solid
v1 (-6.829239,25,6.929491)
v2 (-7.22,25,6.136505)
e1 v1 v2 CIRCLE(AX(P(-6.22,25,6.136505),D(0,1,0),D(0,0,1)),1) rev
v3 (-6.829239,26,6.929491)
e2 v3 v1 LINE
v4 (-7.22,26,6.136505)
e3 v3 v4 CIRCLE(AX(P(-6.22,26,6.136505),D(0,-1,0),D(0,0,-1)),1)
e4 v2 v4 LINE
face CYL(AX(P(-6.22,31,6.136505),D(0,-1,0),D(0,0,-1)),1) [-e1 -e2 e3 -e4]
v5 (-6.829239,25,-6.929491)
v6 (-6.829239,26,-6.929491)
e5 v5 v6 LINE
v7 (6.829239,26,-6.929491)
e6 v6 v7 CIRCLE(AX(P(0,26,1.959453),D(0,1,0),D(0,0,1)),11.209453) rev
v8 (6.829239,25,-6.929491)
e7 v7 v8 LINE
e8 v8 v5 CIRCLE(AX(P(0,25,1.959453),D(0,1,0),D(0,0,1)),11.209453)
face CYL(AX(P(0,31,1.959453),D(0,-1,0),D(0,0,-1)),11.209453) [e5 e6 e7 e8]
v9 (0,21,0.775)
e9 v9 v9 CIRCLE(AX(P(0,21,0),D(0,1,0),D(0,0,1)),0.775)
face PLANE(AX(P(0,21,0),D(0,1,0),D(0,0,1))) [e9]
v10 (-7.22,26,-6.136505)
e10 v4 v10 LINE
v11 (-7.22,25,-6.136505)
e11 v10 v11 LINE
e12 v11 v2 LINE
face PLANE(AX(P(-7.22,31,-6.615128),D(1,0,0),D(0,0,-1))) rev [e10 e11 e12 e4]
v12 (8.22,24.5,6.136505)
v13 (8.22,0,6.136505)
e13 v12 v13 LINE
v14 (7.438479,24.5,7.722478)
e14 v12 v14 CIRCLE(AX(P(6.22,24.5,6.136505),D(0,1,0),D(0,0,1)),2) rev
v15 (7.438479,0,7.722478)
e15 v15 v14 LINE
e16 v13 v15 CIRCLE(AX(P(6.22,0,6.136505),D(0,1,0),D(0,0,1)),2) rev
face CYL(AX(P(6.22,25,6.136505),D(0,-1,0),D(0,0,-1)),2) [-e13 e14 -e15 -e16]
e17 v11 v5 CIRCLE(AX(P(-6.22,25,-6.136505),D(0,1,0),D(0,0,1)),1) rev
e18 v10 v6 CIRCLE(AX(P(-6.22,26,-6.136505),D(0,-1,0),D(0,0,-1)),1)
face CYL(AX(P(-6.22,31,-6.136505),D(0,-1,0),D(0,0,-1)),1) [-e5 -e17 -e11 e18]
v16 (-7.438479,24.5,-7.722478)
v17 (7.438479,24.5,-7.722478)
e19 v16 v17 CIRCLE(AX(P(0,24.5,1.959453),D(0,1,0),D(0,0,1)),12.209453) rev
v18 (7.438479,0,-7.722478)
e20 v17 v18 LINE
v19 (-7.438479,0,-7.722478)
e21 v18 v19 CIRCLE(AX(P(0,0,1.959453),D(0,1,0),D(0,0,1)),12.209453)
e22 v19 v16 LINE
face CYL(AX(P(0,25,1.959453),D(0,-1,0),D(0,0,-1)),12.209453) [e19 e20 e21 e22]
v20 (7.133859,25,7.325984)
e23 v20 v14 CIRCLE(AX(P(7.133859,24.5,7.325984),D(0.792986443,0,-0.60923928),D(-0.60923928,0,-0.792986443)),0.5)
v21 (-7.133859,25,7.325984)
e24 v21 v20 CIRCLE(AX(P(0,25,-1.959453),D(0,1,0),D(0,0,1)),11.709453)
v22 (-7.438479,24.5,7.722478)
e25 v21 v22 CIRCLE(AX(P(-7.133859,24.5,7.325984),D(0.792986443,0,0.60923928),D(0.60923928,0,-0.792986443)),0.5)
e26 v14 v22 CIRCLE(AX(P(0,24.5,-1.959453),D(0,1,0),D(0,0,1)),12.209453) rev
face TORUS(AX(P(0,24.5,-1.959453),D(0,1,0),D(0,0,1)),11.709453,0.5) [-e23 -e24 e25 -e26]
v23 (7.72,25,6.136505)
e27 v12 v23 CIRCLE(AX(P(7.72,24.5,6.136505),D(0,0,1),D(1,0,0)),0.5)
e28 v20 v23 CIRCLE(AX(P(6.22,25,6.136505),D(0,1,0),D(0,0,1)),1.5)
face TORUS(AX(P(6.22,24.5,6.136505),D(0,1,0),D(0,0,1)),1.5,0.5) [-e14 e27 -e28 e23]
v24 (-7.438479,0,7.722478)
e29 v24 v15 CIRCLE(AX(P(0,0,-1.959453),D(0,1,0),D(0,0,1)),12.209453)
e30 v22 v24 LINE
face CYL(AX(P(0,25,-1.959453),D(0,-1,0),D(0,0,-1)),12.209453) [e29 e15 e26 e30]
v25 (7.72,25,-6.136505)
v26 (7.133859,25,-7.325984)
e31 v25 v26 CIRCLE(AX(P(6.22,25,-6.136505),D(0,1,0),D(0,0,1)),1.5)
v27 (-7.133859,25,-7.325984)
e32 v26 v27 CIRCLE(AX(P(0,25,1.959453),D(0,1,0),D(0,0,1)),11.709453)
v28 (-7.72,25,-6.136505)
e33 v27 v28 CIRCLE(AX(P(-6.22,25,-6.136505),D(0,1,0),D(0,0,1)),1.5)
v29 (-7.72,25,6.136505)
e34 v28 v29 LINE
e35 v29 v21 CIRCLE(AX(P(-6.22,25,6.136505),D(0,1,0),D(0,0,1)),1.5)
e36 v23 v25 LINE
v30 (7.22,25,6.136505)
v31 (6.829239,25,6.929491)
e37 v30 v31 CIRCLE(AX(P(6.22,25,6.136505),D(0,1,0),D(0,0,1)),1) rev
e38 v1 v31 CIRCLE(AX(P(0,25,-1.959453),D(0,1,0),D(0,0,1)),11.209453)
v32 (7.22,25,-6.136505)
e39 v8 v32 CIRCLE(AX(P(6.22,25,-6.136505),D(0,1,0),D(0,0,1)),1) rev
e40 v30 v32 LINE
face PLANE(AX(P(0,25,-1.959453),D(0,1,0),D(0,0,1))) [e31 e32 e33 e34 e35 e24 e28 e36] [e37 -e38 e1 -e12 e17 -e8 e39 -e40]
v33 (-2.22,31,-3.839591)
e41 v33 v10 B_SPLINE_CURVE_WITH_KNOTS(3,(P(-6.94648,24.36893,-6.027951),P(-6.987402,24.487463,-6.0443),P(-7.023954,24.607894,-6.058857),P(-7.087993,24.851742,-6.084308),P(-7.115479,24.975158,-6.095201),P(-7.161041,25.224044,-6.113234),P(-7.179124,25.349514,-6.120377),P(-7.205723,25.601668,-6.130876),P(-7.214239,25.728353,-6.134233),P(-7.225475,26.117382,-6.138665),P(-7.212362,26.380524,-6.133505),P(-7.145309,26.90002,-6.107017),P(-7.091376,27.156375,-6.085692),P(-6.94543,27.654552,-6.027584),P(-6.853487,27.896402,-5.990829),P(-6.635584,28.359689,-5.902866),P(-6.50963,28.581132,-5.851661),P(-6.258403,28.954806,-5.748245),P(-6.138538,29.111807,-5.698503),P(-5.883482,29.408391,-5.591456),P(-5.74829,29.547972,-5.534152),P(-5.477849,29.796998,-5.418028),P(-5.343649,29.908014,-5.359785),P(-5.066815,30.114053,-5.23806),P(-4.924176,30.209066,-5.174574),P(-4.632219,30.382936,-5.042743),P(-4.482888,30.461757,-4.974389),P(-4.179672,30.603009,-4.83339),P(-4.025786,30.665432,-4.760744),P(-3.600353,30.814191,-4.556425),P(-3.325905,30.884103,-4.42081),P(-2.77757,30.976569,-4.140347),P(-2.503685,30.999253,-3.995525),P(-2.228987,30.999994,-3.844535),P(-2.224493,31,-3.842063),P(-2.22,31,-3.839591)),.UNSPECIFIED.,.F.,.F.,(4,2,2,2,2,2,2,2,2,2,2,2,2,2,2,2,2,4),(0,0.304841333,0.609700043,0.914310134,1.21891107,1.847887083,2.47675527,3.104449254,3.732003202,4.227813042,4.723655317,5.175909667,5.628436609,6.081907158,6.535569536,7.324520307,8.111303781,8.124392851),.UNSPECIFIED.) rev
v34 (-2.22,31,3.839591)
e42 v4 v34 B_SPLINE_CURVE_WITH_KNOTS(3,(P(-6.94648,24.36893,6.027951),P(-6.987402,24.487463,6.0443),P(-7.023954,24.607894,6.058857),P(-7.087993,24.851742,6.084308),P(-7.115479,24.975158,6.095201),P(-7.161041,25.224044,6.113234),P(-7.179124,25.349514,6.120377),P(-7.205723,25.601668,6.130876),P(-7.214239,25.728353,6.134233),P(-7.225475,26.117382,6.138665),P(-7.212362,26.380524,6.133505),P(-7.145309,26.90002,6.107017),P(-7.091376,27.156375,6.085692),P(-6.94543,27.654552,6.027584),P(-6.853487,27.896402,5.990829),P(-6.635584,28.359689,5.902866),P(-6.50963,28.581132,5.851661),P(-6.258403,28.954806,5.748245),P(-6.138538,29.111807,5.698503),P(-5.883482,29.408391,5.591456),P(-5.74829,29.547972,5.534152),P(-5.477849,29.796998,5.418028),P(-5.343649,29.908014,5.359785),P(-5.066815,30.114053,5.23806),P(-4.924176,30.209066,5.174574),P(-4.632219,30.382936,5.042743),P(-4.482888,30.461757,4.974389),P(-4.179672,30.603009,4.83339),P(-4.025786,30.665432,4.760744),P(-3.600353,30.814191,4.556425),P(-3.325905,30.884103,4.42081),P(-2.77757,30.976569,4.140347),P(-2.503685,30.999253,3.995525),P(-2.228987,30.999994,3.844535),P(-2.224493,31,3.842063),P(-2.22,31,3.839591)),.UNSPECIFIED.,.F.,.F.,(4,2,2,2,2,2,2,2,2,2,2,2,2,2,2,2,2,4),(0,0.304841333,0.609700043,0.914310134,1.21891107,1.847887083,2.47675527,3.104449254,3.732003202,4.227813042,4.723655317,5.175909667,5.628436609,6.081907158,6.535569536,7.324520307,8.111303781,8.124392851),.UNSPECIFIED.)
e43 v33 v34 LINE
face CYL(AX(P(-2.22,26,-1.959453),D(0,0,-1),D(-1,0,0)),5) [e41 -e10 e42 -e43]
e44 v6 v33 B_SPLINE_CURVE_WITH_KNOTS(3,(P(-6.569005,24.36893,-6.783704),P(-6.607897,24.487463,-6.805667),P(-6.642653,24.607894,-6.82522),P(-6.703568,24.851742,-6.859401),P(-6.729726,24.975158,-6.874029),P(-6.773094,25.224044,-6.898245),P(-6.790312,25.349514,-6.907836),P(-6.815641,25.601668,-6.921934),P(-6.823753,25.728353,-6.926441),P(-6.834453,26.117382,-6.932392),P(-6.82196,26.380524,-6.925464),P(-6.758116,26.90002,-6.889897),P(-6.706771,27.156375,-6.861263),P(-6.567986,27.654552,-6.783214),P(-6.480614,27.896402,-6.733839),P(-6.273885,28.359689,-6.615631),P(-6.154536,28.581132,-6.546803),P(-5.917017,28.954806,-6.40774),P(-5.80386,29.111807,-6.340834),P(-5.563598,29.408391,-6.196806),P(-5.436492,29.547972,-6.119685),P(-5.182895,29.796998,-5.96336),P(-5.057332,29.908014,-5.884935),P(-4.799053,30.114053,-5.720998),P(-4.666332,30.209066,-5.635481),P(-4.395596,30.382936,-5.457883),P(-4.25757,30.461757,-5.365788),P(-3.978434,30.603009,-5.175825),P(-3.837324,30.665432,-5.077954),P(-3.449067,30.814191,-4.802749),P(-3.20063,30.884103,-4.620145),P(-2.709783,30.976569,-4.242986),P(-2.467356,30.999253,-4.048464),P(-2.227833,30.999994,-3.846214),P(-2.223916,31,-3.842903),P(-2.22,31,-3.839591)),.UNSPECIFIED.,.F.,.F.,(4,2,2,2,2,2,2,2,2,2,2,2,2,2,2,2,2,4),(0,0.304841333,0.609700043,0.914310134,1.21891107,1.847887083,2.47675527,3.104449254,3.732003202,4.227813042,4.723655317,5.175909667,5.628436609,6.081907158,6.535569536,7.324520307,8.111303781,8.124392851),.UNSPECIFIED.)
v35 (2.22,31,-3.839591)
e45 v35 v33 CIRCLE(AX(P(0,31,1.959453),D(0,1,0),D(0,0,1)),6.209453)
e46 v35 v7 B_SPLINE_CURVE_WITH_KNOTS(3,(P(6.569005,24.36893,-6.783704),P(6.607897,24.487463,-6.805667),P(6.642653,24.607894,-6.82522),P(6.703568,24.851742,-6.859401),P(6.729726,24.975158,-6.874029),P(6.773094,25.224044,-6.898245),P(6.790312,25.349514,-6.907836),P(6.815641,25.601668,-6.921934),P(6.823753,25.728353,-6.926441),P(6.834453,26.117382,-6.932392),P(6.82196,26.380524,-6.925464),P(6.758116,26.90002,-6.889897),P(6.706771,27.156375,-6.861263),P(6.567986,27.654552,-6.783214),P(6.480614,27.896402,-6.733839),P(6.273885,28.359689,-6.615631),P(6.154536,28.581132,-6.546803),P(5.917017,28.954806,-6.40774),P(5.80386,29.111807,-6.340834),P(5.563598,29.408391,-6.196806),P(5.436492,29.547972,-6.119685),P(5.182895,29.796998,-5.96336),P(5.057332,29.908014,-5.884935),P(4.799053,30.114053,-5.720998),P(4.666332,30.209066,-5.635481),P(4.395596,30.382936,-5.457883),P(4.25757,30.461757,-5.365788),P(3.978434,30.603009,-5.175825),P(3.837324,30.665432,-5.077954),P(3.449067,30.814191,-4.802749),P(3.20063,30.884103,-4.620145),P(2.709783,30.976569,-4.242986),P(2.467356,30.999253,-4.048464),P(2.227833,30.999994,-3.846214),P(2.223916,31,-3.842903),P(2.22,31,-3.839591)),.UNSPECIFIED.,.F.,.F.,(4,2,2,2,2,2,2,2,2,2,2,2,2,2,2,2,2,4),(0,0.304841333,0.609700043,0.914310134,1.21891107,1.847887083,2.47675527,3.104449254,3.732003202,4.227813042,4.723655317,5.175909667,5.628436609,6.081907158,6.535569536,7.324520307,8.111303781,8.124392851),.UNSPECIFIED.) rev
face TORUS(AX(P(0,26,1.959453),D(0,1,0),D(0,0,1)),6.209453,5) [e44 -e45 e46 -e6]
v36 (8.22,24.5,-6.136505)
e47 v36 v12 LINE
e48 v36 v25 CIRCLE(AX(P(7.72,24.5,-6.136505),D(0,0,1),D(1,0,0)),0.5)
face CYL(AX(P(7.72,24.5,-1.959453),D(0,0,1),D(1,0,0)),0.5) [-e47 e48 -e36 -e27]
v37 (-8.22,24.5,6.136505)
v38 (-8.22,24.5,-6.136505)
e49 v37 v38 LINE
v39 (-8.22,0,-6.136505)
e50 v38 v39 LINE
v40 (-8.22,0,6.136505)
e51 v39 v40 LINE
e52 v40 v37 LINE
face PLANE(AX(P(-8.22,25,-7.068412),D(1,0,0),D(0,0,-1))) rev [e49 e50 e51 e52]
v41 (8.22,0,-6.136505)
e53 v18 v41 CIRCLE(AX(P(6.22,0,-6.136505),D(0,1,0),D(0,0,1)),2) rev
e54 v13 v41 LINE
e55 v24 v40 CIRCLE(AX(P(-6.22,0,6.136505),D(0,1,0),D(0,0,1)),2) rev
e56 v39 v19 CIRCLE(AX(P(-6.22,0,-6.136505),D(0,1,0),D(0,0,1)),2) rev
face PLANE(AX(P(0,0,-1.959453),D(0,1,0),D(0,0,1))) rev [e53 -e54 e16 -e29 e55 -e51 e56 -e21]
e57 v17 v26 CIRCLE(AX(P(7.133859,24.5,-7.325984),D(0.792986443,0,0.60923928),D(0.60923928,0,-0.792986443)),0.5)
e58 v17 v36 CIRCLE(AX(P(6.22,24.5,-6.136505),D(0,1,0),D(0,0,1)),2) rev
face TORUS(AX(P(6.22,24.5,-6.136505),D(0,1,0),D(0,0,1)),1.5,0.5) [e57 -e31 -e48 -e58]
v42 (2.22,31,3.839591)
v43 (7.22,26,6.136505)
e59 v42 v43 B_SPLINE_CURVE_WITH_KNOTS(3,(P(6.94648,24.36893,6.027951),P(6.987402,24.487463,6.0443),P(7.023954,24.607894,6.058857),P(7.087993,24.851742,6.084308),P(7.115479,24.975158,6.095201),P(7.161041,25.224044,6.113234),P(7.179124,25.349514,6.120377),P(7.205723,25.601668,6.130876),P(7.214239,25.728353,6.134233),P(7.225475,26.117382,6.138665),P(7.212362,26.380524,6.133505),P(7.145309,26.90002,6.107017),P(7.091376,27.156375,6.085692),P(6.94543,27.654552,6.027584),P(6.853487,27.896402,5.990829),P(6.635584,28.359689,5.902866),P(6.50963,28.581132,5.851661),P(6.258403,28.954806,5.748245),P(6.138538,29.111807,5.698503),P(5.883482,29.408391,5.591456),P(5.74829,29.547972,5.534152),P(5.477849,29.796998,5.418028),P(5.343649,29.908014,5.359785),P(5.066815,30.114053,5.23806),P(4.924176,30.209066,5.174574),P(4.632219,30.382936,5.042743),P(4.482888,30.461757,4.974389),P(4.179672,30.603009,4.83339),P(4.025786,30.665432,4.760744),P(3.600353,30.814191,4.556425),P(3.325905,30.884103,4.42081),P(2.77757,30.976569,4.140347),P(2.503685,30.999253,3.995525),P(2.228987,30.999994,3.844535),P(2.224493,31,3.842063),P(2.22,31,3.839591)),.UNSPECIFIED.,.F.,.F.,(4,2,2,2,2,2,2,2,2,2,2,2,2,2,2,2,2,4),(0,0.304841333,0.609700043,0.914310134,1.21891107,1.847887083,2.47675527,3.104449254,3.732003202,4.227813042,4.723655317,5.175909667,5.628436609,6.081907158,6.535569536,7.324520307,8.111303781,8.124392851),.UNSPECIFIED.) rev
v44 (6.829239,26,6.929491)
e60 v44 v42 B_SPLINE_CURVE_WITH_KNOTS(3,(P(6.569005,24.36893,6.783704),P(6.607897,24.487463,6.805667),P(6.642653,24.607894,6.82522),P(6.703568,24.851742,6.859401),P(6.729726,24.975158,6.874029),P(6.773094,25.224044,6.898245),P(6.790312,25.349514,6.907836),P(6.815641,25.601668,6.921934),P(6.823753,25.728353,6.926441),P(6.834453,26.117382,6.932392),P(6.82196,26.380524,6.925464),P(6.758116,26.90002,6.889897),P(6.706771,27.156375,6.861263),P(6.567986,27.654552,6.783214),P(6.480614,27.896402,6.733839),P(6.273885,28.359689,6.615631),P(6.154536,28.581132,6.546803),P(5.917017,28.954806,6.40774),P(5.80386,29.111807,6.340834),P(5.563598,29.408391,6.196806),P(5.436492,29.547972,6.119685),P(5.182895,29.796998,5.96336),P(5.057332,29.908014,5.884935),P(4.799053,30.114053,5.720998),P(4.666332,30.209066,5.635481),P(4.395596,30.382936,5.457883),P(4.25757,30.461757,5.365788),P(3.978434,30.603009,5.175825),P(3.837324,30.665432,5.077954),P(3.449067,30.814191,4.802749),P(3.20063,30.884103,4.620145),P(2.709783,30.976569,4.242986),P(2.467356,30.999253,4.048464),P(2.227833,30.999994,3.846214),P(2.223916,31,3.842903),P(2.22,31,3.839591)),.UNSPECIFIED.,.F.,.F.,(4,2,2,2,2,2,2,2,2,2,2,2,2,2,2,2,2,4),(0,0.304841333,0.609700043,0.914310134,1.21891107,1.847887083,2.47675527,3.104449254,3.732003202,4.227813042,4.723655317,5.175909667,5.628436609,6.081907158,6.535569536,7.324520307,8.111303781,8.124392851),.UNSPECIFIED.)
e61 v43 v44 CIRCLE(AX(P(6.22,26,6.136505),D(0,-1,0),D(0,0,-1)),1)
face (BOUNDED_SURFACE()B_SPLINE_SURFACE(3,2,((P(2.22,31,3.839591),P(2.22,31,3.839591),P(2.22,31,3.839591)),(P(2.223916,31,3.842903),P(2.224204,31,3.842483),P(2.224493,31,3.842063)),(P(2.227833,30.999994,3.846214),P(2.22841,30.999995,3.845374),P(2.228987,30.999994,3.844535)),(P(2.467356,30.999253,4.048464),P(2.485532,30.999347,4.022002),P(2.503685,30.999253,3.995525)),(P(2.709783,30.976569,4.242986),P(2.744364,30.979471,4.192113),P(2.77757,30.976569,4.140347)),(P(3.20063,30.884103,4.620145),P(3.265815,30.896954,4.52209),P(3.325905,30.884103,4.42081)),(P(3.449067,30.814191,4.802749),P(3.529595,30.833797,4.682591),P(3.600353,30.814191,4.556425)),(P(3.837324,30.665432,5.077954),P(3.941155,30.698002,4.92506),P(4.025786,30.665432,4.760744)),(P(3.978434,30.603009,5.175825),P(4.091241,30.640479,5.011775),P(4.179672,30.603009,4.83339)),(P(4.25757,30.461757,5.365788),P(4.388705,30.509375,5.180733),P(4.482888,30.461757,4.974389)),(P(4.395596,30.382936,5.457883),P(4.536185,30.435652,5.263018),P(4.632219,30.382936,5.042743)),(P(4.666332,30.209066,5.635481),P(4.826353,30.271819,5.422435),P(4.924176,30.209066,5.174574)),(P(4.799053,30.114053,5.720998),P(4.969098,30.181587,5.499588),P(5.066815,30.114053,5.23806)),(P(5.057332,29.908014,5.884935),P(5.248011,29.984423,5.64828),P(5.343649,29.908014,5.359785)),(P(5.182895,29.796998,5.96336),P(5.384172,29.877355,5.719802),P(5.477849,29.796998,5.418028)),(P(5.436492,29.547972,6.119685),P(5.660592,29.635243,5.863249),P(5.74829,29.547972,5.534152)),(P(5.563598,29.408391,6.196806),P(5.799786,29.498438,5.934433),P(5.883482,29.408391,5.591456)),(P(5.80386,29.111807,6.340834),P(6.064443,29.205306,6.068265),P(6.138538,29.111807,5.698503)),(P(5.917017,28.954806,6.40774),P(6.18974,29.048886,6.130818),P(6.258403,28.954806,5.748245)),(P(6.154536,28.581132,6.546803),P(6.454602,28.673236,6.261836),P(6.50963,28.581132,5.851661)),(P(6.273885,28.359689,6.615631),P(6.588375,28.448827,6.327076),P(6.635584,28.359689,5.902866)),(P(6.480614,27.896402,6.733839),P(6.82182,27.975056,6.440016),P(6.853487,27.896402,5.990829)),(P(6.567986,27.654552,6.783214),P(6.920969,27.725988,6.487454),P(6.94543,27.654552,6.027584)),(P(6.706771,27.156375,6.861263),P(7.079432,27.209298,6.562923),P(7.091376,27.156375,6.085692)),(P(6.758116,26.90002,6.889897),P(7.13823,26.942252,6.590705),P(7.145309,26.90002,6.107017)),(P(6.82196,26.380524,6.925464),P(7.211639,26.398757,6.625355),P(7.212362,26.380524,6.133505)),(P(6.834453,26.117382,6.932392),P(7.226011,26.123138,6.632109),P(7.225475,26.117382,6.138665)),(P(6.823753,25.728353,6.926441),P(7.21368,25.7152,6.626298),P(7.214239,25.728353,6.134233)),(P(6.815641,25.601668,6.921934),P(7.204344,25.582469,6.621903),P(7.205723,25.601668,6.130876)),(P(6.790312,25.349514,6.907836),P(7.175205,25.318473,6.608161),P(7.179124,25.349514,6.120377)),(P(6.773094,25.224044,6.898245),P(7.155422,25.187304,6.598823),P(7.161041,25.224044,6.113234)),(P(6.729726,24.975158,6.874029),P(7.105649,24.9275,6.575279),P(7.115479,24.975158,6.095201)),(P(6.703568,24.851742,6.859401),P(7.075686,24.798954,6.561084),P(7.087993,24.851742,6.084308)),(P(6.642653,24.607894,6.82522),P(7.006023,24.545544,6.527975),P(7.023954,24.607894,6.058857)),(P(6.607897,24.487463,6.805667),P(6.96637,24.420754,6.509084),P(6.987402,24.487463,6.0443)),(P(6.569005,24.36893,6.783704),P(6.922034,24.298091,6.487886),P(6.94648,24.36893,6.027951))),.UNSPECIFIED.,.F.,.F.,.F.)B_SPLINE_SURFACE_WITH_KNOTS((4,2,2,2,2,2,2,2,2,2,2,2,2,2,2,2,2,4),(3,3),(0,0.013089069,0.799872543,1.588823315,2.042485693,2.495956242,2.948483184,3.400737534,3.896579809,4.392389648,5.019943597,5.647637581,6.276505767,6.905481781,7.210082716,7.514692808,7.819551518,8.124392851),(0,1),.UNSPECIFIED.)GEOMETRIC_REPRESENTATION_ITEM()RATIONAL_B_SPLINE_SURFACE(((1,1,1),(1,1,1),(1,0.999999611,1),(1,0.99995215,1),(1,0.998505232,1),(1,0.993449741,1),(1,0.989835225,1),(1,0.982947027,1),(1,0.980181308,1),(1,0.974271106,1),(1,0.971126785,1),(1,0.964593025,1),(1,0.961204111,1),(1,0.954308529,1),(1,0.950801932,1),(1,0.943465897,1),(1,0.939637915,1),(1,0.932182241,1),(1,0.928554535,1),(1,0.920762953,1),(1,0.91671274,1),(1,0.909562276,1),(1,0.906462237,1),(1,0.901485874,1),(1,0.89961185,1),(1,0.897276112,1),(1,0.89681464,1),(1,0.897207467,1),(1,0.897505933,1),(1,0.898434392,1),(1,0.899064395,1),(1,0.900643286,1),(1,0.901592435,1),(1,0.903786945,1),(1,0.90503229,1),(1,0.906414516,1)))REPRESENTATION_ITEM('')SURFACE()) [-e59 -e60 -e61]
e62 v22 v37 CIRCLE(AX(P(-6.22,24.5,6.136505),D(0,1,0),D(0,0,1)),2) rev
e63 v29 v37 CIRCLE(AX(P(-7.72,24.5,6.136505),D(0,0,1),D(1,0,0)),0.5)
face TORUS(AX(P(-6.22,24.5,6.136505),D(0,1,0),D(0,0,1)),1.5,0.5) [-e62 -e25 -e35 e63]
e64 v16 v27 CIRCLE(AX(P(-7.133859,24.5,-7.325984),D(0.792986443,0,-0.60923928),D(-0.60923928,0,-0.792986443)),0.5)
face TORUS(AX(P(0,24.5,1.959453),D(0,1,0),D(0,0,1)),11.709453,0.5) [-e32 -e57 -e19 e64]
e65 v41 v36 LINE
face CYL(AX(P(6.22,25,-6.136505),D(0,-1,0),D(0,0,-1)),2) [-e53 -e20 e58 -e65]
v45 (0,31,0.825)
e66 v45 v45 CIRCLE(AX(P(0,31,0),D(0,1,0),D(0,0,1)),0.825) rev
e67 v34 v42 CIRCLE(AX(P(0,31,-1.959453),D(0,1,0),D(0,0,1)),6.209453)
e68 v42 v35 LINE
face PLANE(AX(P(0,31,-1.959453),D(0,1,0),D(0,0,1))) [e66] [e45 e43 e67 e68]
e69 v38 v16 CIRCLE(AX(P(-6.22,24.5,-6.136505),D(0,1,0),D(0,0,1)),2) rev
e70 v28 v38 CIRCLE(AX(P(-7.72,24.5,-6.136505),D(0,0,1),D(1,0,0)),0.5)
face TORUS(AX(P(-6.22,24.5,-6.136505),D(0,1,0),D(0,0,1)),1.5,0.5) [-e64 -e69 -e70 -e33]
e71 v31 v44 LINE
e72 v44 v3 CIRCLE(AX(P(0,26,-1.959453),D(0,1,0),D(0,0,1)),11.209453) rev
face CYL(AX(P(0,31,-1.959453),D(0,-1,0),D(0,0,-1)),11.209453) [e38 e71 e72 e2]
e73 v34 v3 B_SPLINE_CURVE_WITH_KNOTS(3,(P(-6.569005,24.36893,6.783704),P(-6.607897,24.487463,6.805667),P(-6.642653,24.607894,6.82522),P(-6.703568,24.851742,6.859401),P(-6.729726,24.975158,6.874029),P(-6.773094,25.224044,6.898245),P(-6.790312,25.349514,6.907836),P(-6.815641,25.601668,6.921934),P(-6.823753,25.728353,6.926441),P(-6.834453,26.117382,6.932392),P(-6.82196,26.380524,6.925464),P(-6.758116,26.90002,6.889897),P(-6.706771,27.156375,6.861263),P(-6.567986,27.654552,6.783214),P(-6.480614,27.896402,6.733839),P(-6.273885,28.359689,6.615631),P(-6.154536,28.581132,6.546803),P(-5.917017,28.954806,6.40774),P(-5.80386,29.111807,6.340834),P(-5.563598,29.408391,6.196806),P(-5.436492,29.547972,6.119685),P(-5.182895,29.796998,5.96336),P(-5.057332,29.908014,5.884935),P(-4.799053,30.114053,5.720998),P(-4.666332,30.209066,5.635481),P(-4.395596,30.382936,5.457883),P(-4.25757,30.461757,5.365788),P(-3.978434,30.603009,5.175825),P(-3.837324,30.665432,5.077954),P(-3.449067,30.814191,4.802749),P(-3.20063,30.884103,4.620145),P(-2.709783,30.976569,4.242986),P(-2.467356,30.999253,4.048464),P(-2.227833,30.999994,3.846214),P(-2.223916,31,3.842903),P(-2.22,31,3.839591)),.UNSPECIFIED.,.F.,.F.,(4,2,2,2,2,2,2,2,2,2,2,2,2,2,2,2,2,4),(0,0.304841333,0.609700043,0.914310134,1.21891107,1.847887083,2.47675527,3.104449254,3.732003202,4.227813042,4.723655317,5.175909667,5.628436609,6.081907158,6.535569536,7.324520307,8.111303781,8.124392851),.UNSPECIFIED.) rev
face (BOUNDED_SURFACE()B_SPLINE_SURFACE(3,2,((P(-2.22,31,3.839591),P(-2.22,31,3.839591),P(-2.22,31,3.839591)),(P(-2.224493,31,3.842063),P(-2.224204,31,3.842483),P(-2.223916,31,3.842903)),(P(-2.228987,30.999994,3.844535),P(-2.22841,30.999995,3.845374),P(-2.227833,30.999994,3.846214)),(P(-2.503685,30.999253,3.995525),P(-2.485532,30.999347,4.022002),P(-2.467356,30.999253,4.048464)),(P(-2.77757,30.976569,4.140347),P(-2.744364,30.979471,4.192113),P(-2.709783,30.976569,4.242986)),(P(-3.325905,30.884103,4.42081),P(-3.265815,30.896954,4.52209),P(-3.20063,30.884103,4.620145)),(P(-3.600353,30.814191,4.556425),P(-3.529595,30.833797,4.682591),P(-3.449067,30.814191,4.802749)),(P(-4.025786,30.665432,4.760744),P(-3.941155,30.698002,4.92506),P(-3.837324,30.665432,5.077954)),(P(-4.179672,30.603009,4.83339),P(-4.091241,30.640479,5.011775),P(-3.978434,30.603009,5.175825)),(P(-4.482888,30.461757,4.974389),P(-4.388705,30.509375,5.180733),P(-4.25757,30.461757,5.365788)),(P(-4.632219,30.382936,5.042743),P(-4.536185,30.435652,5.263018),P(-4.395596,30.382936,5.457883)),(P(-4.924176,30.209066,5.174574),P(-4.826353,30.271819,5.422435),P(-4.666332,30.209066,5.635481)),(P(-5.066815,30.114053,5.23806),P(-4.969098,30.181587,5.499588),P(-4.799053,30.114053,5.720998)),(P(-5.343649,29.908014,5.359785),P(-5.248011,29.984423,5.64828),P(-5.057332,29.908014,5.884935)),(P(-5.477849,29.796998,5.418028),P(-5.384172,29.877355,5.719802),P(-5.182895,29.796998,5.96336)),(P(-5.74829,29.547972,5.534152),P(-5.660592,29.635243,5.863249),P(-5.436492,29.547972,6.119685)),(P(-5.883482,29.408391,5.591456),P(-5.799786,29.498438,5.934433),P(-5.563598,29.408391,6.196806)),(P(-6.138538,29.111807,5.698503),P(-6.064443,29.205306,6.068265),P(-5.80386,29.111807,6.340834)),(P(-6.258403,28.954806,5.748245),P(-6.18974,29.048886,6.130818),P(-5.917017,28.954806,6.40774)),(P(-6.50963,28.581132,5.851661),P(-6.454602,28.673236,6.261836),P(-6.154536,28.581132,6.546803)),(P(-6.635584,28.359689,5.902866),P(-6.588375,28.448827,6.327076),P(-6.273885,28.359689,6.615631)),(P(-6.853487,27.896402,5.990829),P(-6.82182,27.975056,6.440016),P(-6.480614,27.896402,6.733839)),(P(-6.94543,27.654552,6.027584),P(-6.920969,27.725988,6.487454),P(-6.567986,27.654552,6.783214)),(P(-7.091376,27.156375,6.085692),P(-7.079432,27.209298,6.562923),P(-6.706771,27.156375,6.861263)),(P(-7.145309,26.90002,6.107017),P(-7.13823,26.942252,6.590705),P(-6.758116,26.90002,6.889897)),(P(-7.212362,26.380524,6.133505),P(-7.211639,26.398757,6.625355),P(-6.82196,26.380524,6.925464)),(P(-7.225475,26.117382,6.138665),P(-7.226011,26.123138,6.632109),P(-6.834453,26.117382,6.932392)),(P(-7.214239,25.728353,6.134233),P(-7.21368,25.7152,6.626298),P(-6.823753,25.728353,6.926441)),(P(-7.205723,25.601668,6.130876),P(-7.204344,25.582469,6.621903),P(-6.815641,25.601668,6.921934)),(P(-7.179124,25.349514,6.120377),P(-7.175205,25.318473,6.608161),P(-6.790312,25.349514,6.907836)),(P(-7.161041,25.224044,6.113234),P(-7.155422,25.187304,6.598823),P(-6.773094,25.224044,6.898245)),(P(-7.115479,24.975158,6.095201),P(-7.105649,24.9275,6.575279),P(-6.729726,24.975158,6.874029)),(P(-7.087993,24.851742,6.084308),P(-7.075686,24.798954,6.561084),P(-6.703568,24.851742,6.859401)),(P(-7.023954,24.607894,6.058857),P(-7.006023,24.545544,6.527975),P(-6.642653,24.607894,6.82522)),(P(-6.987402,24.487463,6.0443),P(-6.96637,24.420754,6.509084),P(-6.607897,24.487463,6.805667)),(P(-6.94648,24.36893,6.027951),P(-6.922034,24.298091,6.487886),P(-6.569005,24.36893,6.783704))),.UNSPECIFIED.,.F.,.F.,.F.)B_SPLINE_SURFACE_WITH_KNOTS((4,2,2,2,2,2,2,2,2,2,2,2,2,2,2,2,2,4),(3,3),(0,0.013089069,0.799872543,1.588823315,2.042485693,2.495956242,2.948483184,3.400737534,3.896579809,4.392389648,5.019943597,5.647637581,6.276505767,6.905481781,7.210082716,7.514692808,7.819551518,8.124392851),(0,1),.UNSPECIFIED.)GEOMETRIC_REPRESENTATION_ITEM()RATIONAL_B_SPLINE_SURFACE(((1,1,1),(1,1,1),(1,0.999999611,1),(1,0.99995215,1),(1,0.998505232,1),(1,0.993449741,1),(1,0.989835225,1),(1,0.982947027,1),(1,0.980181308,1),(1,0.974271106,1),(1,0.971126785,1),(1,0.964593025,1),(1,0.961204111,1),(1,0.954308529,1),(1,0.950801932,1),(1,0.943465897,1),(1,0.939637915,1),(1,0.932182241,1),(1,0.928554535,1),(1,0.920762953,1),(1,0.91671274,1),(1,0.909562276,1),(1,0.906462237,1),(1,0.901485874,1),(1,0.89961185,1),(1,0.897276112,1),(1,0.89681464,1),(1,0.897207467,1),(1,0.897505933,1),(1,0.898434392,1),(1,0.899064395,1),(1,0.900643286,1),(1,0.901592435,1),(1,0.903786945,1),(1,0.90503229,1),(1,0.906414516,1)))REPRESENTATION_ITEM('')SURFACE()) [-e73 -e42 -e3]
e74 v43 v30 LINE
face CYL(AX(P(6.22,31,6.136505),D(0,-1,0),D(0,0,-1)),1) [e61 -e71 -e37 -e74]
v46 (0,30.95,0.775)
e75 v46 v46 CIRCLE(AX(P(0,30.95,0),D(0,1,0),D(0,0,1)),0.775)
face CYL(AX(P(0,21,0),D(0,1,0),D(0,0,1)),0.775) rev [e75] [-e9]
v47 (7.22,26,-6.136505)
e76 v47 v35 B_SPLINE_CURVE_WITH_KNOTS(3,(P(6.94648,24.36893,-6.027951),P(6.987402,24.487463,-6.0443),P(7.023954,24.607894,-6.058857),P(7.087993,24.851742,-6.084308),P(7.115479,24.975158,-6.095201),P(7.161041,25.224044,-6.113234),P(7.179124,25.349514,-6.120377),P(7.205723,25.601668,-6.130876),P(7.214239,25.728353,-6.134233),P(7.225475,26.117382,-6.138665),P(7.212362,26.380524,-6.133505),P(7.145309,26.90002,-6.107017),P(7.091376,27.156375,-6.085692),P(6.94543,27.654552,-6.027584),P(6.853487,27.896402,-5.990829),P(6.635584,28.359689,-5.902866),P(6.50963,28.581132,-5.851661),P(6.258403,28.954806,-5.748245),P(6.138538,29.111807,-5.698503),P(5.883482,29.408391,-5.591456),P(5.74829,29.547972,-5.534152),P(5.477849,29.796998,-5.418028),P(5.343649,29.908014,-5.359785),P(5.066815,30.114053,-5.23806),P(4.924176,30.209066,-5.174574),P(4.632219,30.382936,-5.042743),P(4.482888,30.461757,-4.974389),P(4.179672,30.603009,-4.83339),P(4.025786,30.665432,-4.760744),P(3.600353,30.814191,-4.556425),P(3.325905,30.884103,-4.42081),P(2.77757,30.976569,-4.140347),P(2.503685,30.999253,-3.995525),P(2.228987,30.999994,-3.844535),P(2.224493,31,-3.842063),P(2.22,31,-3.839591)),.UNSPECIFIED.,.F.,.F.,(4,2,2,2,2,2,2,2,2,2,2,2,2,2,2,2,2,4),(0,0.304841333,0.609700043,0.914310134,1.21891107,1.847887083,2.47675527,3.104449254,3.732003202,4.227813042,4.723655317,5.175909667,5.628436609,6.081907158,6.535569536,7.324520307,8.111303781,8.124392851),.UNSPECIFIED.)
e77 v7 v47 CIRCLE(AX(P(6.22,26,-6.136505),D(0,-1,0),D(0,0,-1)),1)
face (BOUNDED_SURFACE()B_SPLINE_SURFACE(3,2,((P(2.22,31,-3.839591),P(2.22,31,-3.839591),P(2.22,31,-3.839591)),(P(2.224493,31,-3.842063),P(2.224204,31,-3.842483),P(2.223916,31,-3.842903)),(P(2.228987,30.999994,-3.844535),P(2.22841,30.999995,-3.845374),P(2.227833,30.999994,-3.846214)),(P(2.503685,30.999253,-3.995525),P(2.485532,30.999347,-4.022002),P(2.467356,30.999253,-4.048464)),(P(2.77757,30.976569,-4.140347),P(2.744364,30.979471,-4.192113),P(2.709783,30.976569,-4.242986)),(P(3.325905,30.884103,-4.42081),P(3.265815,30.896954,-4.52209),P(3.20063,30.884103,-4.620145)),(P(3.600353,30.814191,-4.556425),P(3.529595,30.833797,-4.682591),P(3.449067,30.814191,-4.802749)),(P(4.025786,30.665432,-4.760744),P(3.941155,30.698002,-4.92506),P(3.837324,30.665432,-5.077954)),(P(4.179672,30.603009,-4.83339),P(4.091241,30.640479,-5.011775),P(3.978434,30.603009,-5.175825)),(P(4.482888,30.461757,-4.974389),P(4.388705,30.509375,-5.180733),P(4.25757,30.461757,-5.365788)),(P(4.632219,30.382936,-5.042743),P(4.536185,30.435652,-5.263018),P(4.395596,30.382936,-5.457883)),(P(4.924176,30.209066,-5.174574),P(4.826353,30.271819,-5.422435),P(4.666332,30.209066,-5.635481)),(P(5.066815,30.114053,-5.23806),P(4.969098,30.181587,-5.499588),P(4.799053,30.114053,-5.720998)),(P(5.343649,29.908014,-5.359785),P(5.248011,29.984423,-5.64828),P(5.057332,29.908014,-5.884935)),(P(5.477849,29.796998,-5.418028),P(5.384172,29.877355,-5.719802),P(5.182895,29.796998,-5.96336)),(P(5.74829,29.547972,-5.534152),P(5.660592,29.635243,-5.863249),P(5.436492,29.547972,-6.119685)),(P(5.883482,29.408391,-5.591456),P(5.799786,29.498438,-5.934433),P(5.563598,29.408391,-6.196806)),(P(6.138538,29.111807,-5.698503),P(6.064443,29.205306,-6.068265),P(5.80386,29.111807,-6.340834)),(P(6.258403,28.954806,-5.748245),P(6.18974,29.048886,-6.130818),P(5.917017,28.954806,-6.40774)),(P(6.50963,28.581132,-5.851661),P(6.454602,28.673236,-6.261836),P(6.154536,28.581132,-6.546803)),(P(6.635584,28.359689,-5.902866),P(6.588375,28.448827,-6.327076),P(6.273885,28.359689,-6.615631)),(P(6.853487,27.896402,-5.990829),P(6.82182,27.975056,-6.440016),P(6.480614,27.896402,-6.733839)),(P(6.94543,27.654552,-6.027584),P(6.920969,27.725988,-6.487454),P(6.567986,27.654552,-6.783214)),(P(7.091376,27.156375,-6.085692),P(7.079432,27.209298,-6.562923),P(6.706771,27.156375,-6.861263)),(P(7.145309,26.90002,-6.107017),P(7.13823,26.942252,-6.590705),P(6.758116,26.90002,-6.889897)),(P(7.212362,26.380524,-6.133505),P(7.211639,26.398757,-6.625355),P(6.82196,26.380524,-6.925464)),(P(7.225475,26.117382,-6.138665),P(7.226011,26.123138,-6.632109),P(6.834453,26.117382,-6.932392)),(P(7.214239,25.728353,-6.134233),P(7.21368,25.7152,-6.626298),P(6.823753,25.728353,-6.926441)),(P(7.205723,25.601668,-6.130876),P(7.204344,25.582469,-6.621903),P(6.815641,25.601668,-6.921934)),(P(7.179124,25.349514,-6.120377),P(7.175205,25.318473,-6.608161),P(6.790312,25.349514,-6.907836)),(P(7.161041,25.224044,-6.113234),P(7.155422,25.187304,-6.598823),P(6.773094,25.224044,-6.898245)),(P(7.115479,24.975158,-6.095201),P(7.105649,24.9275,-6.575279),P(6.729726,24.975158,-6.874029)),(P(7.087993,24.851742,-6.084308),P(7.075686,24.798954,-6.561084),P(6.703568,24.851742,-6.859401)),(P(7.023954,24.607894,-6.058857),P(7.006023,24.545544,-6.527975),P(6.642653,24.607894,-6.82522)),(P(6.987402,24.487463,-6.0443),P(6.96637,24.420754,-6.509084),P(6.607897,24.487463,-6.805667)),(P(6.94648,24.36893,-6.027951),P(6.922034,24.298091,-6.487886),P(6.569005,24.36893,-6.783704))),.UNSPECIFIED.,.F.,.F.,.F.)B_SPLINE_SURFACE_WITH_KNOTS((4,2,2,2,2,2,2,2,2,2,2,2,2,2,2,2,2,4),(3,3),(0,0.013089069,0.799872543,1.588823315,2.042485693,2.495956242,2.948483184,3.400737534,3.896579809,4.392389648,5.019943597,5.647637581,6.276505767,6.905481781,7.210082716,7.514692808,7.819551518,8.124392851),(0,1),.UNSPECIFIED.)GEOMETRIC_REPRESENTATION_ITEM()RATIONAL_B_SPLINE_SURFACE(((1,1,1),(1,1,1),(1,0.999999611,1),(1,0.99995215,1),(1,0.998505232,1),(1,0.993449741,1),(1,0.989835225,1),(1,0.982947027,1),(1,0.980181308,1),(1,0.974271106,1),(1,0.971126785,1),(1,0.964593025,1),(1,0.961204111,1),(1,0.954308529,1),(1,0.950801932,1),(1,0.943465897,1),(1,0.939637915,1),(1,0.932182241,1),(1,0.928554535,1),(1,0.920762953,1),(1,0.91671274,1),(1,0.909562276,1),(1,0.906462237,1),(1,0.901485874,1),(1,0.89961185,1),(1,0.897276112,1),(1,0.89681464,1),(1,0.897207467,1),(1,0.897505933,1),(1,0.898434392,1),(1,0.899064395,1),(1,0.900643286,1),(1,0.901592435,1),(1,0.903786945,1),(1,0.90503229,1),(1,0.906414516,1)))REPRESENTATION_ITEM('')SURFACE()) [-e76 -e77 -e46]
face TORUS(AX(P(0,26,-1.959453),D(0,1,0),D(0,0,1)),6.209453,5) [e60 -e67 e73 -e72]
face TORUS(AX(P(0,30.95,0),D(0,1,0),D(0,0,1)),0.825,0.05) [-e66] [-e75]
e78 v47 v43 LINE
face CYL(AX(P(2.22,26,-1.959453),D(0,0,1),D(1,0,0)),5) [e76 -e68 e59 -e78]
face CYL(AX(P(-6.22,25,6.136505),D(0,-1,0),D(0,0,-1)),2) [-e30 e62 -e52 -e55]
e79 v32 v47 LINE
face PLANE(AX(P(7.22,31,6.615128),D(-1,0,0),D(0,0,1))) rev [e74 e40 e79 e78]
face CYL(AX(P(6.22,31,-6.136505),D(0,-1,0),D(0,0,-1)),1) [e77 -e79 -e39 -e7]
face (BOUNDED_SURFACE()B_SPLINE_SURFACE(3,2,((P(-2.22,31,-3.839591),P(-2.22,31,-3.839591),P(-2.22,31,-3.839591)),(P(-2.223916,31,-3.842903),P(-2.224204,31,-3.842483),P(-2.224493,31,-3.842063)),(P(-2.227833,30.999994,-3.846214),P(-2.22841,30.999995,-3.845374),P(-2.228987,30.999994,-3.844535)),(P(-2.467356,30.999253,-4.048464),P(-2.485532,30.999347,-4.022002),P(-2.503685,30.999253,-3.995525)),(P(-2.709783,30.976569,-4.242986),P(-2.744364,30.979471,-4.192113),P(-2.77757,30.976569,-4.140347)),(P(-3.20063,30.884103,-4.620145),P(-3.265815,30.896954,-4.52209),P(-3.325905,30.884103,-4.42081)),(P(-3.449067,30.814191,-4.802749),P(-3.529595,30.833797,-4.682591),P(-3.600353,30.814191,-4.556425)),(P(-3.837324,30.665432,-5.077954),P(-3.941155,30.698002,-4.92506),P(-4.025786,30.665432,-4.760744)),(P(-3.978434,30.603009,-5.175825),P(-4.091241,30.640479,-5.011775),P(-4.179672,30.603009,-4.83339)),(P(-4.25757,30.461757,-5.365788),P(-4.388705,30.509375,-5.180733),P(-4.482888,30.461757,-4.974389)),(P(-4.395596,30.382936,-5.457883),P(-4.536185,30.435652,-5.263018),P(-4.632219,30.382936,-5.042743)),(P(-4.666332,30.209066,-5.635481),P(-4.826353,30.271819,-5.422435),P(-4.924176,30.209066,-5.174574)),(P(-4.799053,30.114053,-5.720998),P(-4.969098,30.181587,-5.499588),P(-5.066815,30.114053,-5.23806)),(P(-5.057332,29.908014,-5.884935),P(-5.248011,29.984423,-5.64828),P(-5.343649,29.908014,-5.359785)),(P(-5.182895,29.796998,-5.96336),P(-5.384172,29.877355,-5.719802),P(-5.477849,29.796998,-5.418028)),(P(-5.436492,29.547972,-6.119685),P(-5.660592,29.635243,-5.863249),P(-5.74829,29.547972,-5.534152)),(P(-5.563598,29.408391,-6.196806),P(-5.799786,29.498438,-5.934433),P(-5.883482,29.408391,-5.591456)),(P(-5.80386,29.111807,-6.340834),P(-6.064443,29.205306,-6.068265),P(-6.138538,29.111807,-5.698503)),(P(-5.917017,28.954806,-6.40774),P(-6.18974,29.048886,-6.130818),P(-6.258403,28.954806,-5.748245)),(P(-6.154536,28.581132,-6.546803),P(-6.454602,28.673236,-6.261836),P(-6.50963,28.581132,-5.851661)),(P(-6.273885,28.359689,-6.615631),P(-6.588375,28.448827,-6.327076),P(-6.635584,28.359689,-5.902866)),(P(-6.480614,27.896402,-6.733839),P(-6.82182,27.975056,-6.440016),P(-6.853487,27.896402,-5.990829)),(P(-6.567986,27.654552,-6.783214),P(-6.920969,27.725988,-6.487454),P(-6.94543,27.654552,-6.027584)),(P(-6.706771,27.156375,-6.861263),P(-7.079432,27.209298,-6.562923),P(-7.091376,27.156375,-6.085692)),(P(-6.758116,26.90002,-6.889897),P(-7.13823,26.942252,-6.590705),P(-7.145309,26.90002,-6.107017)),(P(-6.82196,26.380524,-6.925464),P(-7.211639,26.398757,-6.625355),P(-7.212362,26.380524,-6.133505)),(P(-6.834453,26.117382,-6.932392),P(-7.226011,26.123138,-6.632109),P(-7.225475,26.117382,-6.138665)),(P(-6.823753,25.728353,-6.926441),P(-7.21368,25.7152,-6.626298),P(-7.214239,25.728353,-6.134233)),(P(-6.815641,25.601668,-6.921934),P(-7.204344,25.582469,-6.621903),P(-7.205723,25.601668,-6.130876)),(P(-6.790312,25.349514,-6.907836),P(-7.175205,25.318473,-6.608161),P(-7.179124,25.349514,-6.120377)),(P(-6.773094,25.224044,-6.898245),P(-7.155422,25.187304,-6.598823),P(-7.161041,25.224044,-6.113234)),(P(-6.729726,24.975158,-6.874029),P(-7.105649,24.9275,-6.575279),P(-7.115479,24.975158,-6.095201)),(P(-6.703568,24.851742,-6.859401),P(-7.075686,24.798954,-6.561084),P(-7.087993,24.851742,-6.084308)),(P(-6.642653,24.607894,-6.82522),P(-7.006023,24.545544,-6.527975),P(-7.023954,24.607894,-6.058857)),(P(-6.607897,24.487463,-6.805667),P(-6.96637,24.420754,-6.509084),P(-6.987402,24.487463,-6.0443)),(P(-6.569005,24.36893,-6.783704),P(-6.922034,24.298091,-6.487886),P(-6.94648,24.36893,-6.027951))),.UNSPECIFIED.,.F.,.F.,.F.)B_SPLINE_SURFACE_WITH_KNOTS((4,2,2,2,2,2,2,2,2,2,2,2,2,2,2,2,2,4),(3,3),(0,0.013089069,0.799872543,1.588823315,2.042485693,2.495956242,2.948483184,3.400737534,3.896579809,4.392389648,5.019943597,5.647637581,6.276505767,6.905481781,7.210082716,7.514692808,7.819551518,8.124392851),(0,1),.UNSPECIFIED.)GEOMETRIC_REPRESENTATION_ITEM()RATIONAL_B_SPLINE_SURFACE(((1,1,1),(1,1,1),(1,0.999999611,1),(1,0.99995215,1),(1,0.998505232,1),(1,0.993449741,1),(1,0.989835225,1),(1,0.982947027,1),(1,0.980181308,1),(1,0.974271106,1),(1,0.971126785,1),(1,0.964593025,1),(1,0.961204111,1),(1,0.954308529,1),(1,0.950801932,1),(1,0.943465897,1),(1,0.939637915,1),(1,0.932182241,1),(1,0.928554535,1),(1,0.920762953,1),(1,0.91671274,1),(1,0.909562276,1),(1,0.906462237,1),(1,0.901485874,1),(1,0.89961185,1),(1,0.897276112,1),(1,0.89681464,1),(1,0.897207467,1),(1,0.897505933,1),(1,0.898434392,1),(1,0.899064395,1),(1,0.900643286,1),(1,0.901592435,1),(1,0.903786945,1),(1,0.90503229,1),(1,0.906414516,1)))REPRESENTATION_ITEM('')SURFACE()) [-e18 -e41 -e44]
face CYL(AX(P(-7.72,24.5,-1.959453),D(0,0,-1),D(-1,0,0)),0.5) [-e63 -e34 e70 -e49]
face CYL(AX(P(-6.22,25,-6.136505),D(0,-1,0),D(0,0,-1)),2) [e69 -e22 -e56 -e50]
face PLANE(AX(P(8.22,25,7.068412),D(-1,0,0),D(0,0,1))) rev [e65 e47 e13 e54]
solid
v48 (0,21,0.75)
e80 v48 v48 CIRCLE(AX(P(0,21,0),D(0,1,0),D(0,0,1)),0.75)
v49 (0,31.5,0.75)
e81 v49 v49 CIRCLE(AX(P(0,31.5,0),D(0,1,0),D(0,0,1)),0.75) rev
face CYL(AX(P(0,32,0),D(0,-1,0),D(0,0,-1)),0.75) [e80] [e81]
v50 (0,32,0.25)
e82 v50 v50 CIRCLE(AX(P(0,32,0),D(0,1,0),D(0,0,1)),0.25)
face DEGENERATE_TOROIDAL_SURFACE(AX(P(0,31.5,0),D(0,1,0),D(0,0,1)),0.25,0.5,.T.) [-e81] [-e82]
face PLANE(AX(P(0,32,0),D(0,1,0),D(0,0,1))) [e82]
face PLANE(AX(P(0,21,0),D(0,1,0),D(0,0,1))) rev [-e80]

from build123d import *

# Parameters (mm, degrees)
BOSS_EXTRUDE1_DEPTH      = 25
SHELL1_T                 = -1
BOSS_EXTRUDE2_DEPTH      = 30
FILLET2_R                = 5
FILLET3_R                = 1
SKETCH3_R                = 0.75
CUT_EXTRUDE1_DEPTH       = 10
BOSS_EXTRUDE3_DEPTH      = 1
BOSS_EXTRUDE3_DEPTH_BACK = 10
SKETCH3_2_R              = 0.75
FILLET4_R                = 0.5
FILLET5_R                = 2
MOVE_START               = 21
MOVE_FACE1_OUTLINE_R     = 0.775
MOVE_FACE1_OUTLINE_R_2   = 0.75
MOVE_FACE1_DEPTH         = 10
FILLET6_R                = 0.05
FILLET7_R                = 0.5


# Read off the part's stored shape, not the designer's step: Move Face1
with BuildPart() as part:
    # Sketch1 → Boss-Extrude1 (new body)
    with BuildSketch(Plane(origin=(0, 0, 0), x_dir=(1, 0, 0), z_dir=(0, 1, 0))):
        with BuildLine():
            Line((8.22, -7.068411902), (8.22, 7.068411902))
            ThreePointArc((8.22, 7.068411902), (0, 10.25), (-8.22, 7.068411902))
            Line((-8.22, 7.068411902), (-8.22, -7.068411902))
            ThreePointArc((-8.22, -7.068411902), (0, -10.25), (8.22, -7.068411902))
        make_face()
    extrude(amount=BOSS_EXTRUDE1_DEPTH)

    # Shell1
    shell1_openings = [part.faces().sort_by_distance(p)[0] for p in [
        (0, 25, 0),
    ]]
    offset(amount=SHELL1_T, openings=shell1_openings, kind=Kind.INTERSECTION)

    # Sketch2 → Boss-Extrude2 (add)
    with BuildSketch(Plane(origin=(0, 1, 0), x_dir=(1, 0, 0), z_dir=(0, 1, 0))):
        with BuildLine():
            Line((7.22, -6.615127941), (7.22, 6.615127941))
            ThreePointArc((7.22, 6.615127941), (0, 9.25), (-7.22, 6.615127941))
            Line((-7.22, 6.615127941), (-7.22, -6.615127941))
            ThreePointArc((-7.22, -6.615127941), (0, -9.25), (7.22, -6.615127941))
        make_face()
    extrude(amount=BOSS_EXTRUDE2_DEPTH)

    # Fillet2
    # the kernel refuses this fillet: 5 mm, written as the material it takes off along each edge
    with BuildSketch(Plane(origin=(0, 31, -1.959453333), x_dir=(-0.9702500957932787, 0, -0.24210483599699856), z_dir=(0.24210483599699856, 0, -0.9702500957932787))) as fillet2_piece_1:
        with BuildLine():
            CenterArc((11.209453333 - FILLET2_R, -FILLET2_R), FILLET2_R, 0, 90)
            Line((11.209453333 - FILLET2_R, 0), (11.209453333, 0))
            Line((11.209453333, 0), (11.209453333, -FILLET2_R))
        make_face()
    revolve(axis=Axis((0, 31, -1.959453333), (0, 1, 0)), revolution_arc=208.0216057, mode=Mode.SUBTRACT)
    with BuildSketch(Plane(origin=(7.22, 31, 19.115127941), x_dir=(0, -1, 0), z_dir=(0, 0, -1)), Plane(origin=(-7.22, 31, -19.115127941), x_dir=(0, -1, 0), z_dir=(0, 0, 1))) as fillet2_piece_2:
        with BuildLine():
            CenterArc((FILLET2_R, FILLET2_R), FILLET2_R, 180, 90)
            Line((0, FILLET2_R), (0, 0))
            Line((0, 0), (FILLET2_R, 0))
        make_face()
    extrude(amount=38.230255882, mode=Mode.SUBTRACT)
    with BuildSketch(Plane(origin=(0, 31, 1.959453333), x_dir=(0.9702500957932789, 0, 0.24210483599699756), z_dir=(-0.24210483599699756, 0, 0.9702500957932789))) as fillet2_piece_3:
        with BuildLine():
            CenterArc((11.209453333 - FILLET2_R, -FILLET2_R), FILLET2_R, 0, 90)
            Line((11.209453333 - FILLET2_R, 0), (11.209453333, 0))
            Line((11.209453333, 0), (11.209453333, -FILLET2_R))
        make_face()
    revolve(axis=Axis((0, 31, 1.959453333), (0, 1, 0)), revolution_arc=208.0216057, mode=Mode.SUBTRACT)

    # Fillet3
    fillet3_edges = [part.edges().sort_by_distance(p)[0] for p in [
        (-7.22, 25.5, 6.615127941),
        (-7.22, 25.5, -6.615127941),
        (7.22, 25.5, -6.615127941),
        (7.22, 25.5, 6.615127941),
        (5.607218199, 29.677873424, -5.828692054),
        (5.607218199, 29.677873424, 5.828692054),
        (-5.607218199, 29.677873424, -5.828692054),
        (-5.607218199, 29.677873424, 5.828692054),
    ]]
    fillet(fillet3_edges, radius=FILLET3_R)

    # Sketch3 → Cut-Extrude1 (cut)
    with BuildSketch(Plane(origin=(0, 31, 0), x_dir=(1, 0, 0), z_dir=(0, 1, 0))):
        with Locations(Location((0, 0, 0), (0, 0, 270))):
            Circle(SKETCH3_R)
    extrude(amount=-CUT_EXTRUDE1_DEPTH, mode=Mode.SUBTRACT)

    # Fillet5
    fillet5_edges = [part.edges().sort_by_distance(p)[0] for p in [
        (-8.22, 12.5, 7.068411902),
        (-8.22, 12.5, -7.068411902),
        (8.22, 12.5, -7.068411902),
        (8.22, 12.5, 7.068411902),
    ]]
    fillet(fillet5_edges, radius=FILLET5_R)

    # Move Face1 outline → Move Face1 (cut)
    with BuildSketch(Plane(origin=(0, 0, 0), x_dir=(1, 0, 0), z_dir=(0, 1, 0)).offset(MOVE_START)):
        Circle(MOVE_FACE1_OUTLINE_R)
        Circle(MOVE_FACE1_OUTLINE_R_2, mode=Mode.SUBTRACT)
    extrude(amount=MOVE_FACE1_DEPTH, mode=Mode.SUBTRACT)

    # Fillet6
    fillet6_edges = [part.edges().sort_by_distance(p)[0] for p in [
        (-0.775, 31, 0),
    ]]
    fillet(fillet6_edges, radius=FILLET6_R)

    # Fillet7
    fillet7_edges = [part.edges().sort_by_distance(p)[0] for p in [
        (0, 25, -10.25),
        (0, 25, 10.25),
        (8.22, 25, 0),
        (8.014011862, 25, 7.020541767),
        (8.014011862, 25, -7.020541767),
        (-8.014011862, 25, 7.020541767),
        (-8.014011862, 25, -7.020541767),
        (-8.22, 25, 0),
    ]]
    fillet(fillet7_edges, radius=FILLET7_R)


with BuildPart() as body_2:
    # Sketch3<2> → Boss-Extrude3 (new, two sides: drawn at the far end of the back side and taken through both)
    with BuildSketch(Plane(origin=(0, 31, 0), x_dir=(1, 0, 0), z_dir=(0, 1, 0)).offset(-BOSS_EXTRUDE3_DEPTH_BACK)):
        with Locations(Location((0, 0, 0), (0, 0, 270))):
            Circle(SKETCH3_2_R)
    extrude(amount=BOSS_EXTRUDE3_DEPTH + BOSS_EXTRUDE3_DEPTH_BACK)

    # Fillet4
    fillet4_edges = [body_2.edges().sort_by_distance(p)[0] for p in [
        (0, 32, -0.75),
    ]]
    fillet(fillet4_edges, radius=FILLET4_R)


solid = Compound([part.part, body_2.part])
